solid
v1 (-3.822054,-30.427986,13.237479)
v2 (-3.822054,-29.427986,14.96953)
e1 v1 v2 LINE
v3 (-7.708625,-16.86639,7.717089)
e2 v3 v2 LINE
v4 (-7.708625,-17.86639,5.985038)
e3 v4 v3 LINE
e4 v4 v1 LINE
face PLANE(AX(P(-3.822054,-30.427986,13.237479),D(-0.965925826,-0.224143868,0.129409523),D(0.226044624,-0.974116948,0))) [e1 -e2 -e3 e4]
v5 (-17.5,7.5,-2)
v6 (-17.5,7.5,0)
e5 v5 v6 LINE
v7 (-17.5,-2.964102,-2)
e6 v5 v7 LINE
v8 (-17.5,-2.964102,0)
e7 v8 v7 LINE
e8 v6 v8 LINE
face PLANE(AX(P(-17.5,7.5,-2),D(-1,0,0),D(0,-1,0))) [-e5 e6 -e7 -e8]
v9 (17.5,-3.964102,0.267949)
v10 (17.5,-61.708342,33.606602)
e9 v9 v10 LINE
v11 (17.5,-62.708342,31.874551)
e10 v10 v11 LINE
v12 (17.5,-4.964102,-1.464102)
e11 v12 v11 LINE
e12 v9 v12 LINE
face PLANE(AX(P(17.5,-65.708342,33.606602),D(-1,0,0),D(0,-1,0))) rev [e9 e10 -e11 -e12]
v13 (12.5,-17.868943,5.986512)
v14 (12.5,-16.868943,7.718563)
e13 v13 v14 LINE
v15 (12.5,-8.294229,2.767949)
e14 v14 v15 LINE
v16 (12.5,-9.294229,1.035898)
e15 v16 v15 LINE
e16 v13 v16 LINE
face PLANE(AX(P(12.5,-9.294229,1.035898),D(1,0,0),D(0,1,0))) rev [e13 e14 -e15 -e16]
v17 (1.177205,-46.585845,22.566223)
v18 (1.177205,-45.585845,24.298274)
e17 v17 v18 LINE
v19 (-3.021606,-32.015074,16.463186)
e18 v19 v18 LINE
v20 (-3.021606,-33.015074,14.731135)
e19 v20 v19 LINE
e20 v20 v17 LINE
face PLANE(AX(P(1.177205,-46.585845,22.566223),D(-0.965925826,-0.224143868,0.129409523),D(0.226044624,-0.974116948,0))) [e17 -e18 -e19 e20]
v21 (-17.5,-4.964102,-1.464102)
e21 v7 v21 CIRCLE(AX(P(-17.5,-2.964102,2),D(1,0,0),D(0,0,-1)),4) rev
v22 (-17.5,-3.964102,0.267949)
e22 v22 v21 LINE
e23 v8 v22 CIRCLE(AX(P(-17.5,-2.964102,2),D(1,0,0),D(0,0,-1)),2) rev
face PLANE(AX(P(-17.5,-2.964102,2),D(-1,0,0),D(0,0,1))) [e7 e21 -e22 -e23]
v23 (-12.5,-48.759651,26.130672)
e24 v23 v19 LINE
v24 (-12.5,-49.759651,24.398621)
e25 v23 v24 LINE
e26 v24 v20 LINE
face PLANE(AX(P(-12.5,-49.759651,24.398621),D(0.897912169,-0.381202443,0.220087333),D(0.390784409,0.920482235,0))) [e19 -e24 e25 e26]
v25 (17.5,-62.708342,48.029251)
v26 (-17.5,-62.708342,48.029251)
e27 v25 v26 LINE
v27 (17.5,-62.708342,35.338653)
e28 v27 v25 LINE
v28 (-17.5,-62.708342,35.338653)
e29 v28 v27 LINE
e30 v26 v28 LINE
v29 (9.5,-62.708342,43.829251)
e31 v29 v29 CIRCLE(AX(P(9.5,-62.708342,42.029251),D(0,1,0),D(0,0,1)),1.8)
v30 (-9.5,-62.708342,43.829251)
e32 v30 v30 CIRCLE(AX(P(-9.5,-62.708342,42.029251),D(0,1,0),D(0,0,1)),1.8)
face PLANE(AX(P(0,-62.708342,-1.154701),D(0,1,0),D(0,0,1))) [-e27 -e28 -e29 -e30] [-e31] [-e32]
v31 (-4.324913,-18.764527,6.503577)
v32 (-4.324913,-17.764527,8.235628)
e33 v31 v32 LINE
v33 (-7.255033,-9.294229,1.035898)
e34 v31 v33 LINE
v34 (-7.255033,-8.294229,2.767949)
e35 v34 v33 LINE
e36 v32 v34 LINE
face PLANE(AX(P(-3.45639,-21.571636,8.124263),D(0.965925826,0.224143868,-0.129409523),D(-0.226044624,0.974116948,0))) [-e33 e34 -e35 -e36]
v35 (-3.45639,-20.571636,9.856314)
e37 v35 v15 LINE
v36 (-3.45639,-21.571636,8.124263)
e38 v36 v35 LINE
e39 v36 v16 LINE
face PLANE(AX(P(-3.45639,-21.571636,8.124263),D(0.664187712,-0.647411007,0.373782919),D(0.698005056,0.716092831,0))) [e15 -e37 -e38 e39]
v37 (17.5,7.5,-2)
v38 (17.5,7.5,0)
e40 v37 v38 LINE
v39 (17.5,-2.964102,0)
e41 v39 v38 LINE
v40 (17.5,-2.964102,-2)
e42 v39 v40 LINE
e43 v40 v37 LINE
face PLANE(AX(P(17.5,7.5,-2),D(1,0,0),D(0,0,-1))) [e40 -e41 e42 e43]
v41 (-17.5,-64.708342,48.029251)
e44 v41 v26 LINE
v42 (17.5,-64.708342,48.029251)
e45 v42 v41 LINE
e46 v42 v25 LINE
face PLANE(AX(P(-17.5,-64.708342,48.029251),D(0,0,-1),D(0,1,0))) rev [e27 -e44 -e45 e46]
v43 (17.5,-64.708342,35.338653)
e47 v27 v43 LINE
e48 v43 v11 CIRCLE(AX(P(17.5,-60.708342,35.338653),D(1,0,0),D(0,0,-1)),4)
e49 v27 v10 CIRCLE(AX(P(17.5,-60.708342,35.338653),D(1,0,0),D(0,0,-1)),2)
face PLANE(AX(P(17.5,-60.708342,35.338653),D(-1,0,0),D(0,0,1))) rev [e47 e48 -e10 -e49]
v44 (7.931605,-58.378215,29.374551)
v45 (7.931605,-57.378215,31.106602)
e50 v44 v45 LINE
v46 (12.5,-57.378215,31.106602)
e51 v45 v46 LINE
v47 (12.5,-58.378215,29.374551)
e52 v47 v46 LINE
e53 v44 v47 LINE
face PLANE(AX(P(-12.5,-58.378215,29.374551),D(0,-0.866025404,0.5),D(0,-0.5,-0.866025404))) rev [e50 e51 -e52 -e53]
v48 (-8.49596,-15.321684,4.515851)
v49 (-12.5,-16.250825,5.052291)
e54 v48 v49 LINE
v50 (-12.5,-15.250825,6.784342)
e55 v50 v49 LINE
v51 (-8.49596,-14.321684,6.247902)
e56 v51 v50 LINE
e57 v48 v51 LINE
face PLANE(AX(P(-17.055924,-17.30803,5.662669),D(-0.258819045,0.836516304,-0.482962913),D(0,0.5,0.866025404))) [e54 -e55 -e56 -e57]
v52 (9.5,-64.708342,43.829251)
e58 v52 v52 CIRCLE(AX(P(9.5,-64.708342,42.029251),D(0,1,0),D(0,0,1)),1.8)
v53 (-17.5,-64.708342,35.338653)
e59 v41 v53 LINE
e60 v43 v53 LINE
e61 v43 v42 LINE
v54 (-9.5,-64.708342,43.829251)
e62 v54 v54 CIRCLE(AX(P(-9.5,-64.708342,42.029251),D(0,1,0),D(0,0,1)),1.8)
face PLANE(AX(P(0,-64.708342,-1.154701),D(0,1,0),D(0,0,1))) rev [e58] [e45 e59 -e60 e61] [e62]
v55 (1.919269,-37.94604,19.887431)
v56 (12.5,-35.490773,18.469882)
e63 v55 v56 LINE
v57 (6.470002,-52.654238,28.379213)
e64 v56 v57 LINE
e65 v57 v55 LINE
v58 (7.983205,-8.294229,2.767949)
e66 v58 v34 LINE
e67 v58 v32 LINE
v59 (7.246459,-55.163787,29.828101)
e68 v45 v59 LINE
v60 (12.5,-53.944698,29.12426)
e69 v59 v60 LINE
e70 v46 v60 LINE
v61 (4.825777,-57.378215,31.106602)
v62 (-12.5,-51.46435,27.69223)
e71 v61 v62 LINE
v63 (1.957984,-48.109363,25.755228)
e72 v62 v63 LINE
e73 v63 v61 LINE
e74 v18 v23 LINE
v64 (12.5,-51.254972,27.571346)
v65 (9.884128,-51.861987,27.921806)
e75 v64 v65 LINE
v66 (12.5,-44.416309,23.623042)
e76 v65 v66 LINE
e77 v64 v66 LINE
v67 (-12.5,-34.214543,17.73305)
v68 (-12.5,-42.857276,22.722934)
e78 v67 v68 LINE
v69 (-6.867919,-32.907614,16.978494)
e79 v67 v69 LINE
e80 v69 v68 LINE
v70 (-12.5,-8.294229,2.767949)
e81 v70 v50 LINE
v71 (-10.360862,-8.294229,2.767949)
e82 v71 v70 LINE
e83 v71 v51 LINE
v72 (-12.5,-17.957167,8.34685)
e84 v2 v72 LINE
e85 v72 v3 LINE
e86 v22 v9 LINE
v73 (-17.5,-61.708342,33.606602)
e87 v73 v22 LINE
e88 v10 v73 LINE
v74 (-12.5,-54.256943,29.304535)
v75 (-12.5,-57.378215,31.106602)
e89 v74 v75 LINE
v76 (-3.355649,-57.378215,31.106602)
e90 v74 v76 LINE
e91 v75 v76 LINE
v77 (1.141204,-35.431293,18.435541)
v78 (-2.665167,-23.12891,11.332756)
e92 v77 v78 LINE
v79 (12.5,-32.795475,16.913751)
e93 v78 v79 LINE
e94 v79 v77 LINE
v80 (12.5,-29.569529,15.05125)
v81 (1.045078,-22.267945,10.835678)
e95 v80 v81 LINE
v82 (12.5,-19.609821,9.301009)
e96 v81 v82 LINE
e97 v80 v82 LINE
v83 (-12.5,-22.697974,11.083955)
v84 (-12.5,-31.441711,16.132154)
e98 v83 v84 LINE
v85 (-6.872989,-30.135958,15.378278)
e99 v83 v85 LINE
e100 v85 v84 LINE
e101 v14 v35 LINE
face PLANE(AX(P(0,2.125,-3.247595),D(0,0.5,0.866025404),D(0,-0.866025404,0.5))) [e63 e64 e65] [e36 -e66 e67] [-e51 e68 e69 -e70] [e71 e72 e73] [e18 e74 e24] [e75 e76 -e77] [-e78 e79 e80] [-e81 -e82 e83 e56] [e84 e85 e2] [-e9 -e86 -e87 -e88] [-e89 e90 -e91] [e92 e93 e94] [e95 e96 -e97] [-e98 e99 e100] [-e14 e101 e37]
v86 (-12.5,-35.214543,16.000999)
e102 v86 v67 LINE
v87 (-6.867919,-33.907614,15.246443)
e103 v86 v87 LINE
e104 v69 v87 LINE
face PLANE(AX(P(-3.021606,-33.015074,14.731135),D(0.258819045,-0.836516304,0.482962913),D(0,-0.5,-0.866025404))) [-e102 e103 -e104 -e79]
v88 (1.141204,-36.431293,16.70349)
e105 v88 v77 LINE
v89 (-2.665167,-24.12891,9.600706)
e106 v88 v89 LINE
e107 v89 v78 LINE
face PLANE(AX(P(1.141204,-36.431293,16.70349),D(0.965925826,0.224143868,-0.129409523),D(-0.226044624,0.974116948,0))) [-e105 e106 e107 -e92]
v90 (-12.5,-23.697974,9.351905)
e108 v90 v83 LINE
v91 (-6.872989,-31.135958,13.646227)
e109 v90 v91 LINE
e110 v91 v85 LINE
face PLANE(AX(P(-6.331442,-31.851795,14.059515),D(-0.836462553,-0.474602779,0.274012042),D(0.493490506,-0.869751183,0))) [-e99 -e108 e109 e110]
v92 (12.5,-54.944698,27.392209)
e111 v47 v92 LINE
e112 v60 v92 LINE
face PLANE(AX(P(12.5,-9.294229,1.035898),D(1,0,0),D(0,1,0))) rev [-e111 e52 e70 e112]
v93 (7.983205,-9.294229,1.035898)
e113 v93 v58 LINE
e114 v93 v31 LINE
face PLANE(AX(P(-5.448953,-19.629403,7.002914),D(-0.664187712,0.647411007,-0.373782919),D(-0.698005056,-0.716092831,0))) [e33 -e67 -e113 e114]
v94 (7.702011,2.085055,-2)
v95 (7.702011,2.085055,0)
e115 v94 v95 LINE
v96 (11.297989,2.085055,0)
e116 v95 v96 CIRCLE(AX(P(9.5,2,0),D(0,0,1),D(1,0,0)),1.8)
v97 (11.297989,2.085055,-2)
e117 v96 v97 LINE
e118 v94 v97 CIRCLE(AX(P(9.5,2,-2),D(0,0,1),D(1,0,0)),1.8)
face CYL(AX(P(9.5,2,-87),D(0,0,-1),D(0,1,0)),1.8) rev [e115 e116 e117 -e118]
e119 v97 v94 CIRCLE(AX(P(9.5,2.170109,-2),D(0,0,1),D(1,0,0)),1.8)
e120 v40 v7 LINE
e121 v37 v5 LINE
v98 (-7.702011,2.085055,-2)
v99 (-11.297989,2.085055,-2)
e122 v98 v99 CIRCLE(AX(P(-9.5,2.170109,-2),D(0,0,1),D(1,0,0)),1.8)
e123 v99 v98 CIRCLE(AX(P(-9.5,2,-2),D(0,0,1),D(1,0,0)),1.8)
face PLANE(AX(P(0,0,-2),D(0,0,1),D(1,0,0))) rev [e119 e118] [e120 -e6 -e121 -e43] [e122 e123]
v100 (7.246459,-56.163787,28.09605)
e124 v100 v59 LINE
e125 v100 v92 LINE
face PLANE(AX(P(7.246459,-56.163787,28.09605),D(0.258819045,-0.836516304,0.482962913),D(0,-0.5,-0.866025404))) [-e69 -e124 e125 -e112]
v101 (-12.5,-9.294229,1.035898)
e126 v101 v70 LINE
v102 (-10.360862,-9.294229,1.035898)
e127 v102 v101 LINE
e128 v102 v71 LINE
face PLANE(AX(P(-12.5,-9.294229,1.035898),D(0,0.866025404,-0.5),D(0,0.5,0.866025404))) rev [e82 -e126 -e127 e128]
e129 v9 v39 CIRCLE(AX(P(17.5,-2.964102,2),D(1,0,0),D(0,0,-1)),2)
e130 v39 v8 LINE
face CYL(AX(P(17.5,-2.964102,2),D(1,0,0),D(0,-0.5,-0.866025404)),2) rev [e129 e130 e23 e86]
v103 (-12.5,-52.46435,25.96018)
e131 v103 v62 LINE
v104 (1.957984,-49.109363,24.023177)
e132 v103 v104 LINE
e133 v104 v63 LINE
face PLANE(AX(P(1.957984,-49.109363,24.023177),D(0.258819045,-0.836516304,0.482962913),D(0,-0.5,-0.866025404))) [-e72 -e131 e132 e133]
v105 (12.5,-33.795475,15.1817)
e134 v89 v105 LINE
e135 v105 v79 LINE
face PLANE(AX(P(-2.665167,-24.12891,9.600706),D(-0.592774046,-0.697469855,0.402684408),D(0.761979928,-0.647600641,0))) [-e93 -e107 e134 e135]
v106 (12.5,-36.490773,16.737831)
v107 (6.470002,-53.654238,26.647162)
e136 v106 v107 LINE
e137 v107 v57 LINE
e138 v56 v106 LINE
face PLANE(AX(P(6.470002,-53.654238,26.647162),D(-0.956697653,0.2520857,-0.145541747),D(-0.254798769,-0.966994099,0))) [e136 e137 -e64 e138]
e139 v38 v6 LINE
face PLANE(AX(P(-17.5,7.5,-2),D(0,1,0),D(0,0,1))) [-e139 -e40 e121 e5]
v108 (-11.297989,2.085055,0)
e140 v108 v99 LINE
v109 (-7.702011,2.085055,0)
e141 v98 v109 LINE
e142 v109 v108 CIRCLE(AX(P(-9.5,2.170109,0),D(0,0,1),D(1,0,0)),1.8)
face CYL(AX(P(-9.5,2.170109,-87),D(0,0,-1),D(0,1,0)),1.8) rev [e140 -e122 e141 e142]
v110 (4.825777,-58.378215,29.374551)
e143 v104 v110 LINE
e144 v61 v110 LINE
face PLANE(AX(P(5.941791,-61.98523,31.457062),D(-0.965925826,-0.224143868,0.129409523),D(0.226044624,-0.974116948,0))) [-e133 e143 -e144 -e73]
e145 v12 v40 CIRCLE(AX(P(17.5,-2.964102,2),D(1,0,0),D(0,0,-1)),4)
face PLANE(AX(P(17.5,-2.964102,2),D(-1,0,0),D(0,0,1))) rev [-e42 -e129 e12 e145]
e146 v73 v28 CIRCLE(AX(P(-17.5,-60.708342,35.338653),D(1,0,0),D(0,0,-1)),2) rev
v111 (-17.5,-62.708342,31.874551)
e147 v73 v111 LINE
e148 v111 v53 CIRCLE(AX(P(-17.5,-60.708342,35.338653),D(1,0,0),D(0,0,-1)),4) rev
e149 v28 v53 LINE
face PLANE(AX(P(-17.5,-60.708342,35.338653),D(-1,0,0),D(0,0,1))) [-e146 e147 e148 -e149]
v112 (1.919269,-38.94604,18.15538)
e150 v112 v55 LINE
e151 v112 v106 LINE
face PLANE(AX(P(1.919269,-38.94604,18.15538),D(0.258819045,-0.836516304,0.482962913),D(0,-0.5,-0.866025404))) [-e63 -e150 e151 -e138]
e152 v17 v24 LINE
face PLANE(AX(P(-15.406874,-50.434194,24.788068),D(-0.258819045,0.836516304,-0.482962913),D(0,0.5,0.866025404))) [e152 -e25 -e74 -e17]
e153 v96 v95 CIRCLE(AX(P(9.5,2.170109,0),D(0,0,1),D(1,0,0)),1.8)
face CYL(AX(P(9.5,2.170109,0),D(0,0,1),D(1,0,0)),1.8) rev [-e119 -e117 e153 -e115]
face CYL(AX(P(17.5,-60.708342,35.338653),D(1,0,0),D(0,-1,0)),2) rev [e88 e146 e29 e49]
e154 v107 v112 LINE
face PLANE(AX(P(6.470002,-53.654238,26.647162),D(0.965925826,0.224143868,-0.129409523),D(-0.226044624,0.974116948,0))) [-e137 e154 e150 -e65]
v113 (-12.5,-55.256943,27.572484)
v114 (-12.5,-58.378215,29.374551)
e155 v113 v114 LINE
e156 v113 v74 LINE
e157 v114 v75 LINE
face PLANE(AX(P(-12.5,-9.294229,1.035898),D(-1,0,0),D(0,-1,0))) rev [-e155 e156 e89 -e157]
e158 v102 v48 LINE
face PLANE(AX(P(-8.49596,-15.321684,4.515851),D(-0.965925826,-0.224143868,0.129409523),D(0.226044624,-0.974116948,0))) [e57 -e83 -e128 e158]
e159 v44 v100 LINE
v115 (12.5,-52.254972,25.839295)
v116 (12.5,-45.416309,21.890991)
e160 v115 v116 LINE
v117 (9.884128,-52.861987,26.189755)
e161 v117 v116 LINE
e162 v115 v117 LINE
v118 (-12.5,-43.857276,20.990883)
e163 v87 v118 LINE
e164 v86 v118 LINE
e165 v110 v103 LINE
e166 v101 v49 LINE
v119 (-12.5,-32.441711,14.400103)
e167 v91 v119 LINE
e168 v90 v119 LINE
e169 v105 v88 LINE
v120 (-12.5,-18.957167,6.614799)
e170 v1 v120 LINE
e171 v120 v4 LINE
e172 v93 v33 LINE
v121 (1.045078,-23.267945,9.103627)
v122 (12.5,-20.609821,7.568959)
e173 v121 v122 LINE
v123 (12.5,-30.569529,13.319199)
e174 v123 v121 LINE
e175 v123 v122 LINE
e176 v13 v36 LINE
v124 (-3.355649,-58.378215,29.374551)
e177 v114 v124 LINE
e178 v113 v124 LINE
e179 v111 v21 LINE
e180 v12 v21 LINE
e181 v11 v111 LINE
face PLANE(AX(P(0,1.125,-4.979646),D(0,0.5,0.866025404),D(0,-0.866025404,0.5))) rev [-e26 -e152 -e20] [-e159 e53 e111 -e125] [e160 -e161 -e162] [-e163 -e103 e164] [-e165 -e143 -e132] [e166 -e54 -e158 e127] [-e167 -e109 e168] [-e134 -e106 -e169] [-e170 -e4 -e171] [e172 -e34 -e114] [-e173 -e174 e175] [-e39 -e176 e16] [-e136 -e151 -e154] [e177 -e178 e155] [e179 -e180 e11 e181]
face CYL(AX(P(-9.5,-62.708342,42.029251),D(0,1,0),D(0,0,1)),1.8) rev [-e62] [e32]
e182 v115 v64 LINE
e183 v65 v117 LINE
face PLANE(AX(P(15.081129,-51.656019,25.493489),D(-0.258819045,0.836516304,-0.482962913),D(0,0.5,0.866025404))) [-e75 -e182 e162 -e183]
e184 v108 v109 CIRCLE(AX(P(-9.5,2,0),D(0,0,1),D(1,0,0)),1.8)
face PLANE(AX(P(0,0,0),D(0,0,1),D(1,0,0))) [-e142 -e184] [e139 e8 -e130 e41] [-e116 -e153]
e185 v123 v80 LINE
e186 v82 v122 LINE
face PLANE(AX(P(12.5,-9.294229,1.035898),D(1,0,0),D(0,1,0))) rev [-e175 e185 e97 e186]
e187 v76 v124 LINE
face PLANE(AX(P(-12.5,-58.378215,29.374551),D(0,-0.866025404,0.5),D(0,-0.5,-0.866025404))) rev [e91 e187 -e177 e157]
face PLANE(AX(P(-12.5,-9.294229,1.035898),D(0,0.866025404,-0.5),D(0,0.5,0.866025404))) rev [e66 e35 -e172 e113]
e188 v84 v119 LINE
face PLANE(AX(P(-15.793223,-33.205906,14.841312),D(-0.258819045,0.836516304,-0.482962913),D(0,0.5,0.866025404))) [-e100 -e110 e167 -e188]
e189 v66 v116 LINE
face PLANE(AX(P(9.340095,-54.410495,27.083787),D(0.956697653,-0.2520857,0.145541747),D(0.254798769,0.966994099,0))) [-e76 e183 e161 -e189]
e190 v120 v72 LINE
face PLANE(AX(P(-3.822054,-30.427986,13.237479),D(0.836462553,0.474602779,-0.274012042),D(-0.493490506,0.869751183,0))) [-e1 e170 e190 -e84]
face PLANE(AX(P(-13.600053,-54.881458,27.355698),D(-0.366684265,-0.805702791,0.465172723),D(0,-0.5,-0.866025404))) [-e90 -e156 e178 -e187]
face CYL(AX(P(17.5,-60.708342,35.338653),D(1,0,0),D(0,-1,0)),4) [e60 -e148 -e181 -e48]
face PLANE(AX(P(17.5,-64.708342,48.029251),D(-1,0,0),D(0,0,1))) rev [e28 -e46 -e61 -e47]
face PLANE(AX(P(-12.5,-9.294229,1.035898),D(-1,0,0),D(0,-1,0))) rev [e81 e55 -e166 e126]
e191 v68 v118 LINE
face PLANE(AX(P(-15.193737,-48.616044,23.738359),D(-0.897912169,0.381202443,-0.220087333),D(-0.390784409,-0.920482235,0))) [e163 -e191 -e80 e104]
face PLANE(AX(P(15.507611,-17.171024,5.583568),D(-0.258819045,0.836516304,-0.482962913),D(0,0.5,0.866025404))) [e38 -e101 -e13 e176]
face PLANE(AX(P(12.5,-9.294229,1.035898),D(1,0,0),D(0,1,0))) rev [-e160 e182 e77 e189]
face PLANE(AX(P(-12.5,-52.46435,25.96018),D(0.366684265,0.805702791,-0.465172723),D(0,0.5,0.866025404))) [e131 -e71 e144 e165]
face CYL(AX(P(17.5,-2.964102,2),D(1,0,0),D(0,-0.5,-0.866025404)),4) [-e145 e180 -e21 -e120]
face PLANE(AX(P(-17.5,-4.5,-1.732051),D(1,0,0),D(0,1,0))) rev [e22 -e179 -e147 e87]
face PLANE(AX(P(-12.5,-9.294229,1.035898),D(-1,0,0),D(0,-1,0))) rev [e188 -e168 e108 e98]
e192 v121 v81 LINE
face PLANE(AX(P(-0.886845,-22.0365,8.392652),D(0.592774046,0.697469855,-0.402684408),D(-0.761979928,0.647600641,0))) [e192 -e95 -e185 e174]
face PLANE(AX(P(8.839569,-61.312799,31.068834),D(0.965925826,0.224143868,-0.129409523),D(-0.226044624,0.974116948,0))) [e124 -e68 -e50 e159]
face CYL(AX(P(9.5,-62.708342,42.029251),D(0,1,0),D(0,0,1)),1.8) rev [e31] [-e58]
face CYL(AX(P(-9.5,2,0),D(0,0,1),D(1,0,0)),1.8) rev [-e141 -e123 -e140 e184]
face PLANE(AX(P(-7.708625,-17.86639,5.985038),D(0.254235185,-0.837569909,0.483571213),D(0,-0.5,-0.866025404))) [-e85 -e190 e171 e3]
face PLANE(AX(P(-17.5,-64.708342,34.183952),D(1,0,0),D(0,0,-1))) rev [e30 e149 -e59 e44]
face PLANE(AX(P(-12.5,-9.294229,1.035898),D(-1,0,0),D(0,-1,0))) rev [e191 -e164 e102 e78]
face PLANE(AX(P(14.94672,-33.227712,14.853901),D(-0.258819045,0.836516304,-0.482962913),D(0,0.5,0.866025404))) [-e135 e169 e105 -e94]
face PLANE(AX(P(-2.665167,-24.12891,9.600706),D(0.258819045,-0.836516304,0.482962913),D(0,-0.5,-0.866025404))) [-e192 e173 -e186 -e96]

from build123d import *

# Parameters (mm, degrees)
SKETCH1_W            = 35
SKETCH1_H            = 15
BASE_FLANGE1_DEPTH   = 2
EDGE_FLANGE1_START   = -17.5
EDGE_FLANGE1_DEPTH   = 35
EDGE_FLANGE1_2_DEPTH = 35
EDGE_FLANGE2_START   = -17.5
EDGE_FLANGE2_DEPTH   = 35
EDGE_FLANGE2_2_DEPTH = 35
SKETCH8_W            = 25
SKETCH8_H            = 56.677305051
CUT_EXTRUDE1_DEPTH   = 10
BOSS_EXTRUDE1_DEPTH  = 2
BOSS_EXTRUDE2_DEPTH  = 2
M3_CLEARANCE_HOLE1_D = 3.6
M3_CLEARANCE_HOLE2_D = 3.6
M3_CLEARANCE_HOLE3_D = 3.6
M3_CLEARANCE_HOLE4_D = 3.6


# Read off the part's stored shape, not the designer's step: Edge-Flange1, Edge-Flange2
# Sheet-metal steps are written as plain solids
with BuildPart() as part:
    # Sketch1 → Base-Flange1 (new body)
    with BuildSketch(Plane.XY):
        Rectangle(SKETCH1_W, SKETCH1_H)
    extrude(amount=-BASE_FLANGE1_DEPTH)

    # Edge-Flange1 outline → Edge-Flange1 (cut)
    with BuildSketch(Plane.YZ.offset(EDGE_FLANGE1_START)):
        with BuildLine():
            ThreePointArc((-2.964101615, -2), (-3.999377795, -1.863703305), (-4.964101615, -1.464101615))
            Line((-4.964101615, -1.464101615), (-7.5, 0))
            Line((-7.5, 0), (-7.5, -2))
            Line((-7.5, -2), (-2.964101615, -2))
        make_face()
    extrude(amount=EDGE_FLANGE1_DEPTH, mode=Mode.SUBTRACT)

    # Edge-Flange1 2 outline → Edge-Flange1 2 (add)
    with BuildSketch(Plane.YZ.offset(EDGE_FLANGE1_START)):
        with BuildLine():
            Line((-65.708341645, 33.606601718), (-7.5, 0))
            Line((-7.5, 0), (-2.964101615, 0))
            ThreePointArc((-2.964101615, 0), (-3.481739705, 0.068148347), (-3.964101615, 0.267949192))
            Line((-3.964101615, 0.267949192), (-64.708341645, 35.338652525))
            Line((-64.708341645, 35.338652525), (-65.708341645, 33.606601718))
        make_face()
    extrude(amount=EDGE_FLANGE1_2_DEPTH)

    # Edge-Flange2 outline → Edge-Flange2 (cut)
    with BuildSketch(Plane.YZ.offset(EDGE_FLANGE2_START)):
        with BuildLine():
            ThreePointArc((-62.708341645, 31.87455091), (-64.17244326, 33.338652525), (-64.708341645, 35.338652525))
            Line((-64.708341645, 35.338652525), (-65.708341645, 33.606601718))
            Line((-65.708341645, 33.606601718), (-62.708341645, 31.87455091))
        make_face()
    extrude(amount=EDGE_FLANGE2_DEPTH, mode=Mode.SUBTRACT)

    # Edge-Flange2 2 outline → Edge-Flange2 2 (add)
    with BuildSketch(Plane.YZ.offset(EDGE_FLANGE2_START)):
        with BuildLine():
            Line((-64.708341645, 48.029251449), (-64.708341645, 35.338652525))
            Line((-64.708341645, 35.338652525), (-61.708341645, 33.606601718))
            ThreePointArc((-61.708341645, 33.606601718), (-62.440392453, 34.338652525), (-62.708341645, 35.338652525))
            Line((-62.708341645, 35.338652525), (-62.708341645, 48.029251449))
            Line((-62.708341645, 48.029251449), (-64.708341645, 48.029251449))
        make_face()
    extrude(amount=EDGE_FLANGE2_2_DEPTH)

    # Sketch8 → Cut-Extrude1 (cut)
    with BuildSketch(Plane(origin=(0, -0.875, -1.515544457), x_dir=(1, 0, 0), z_dir=(0, 0.499999999999995, 0.8660254037844416))):
        with Locations((0, -36.905639824)):
            Rectangle(SKETCH8_W, SKETCH8_H)
    extrude(amount=-CUT_EXTRUDE1_DEPTH, mode=Mode.SUBTRACT)

    # Sketch9 → Boss-Extrude1 (add)
    with BuildSketch(Plane(origin=(0, -0.875, -1.515544457), x_dir=(1, 0, 0), z_dir=(0, 0.499999999999995, 0.8660254037844416))):
        Polygon((8.83956854, -68.632858088), (7.246458748, -62.687291403), (15.857586038, -60.3799468), (15.081128903, -57.482169321), (6.470001613, -59.789513924), (1.919269462, -42.805950327), (15.365688048, -39.202993325), (14.946719777, -36.202993325), (1.14120391, -39.902170153), (-2.665166674, -25.696601742), (16.123001013, -20.662327383), (15.50761088, -17.662327383), (-3.456389996, -22.743716103), (-8.33426209, -4.539249615), (-11.232039569, -5.31570675), (-8.495960417, -15.52689316), (-17.05592393, -17.82052847), (-16.279466794, -20.718305949), (-7.708625485, -18.465267128), (-3.822054178, -32.970148713), (-15.793222539, -36.177813607), (-15.040127716, -39.177813607), (-3.021606391, -35.957460524), (1.177204702, -51.627636855), (-15.406874361, -56.071327447), (-14.947395895, -59.071327447), (1.957983923, -54.541544577), (5.941791061, -69.409315224), align=None)
    extrude(amount=-BOSS_EXTRUDE1_DEPTH)

    # Sketch10 → Boss-Extrude2 (add)
    with BuildSketch(Plane(origin=(0, -0.875, -1.515544457), x_dir=(1, 0, 0), z_dir=(0, 0.499999999999995, 0.8660254037844416))):
        Polygon((-3.456389996, -22.743716103), (12.5, -8.566987298), (10.507436864, -6.324289782), (-5.448953132, -20.501018587), align=None)
        Polygon((-2.665166674, -25.696601742), (12.5, -36.858589914), (14.278322137, -34.442483464), (-0.886844536, -23.280495293), align=None)
        Polygon((-3.822054178, -32.970148713), (-12.5, -19.724787915), (-15.00938766, -21.368860167), (-6.331441838, -34.614220965), align=None)
        Polygon((-12.5, -55.29243281), (-3.021606391, -35.957460524), (-5.715342898, -34.636936526), (-15.193736507, -53.971908812), align=None)
        Polygon((6.470001613, -59.789513924), (12.5, -39.970852124), (15.37009296, -40.844102603), (9.340094573, -60.662764404), align=None)
        Polygon((-12.5, -58.415549694), (4.825776546, -65.244292349), (3.725723751, -68.035328689), (-13.600052794, -61.206586033), align=None)
    extrude(amount=-BOSS_EXTRUDE2_DEPTH)

    # M3 Clearance Hole1 (through all)
    with Locations(Plane(origin=(-15.830402425, -63.569767603, -87), x_dir=(-1, 0, 0), z_dir=(0, 0, -1))):
        with Locations((-25.330402425, 65.569767603), (-6.330402425, 65.739876607)):
            Hole(M3_CLEARANCE_HOLE1_D / 2)

    # M3 Clearance Hole2 (through all)
    with Locations(Plane(origin=(15.830402425, -63.569767603, 0), x_dir=(1, 0, 0), z_dir=(0, 0, 1))):
        with Locations((-25.330402425, 65.569767603), (-6.330402425, 65.739876607)):
            Hole(M3_CLEARANCE_HOLE2_D / 2)

    # M3 Clearance Hole3 (through all)
    with Locations(Plane(origin=(15.830402425, -62.708341645, 22.375161803), x_dir=(-1, 0, 0), z_dir=(0, 1, 0))):
        with Locations((25.330402425, 19.654089646), (6.330402425, 19.654089646)):
            Hole(M3_CLEARANCE_HOLE3_D / 2)

    # M3 Clearance Hole4 (through all)
    with Locations(Plane(origin=(-15.830402425, -62.708341645, -109.375161803), x_dir=(1, 0, 0), z_dir=(0, 1, 0))):
        with Locations((25.330402425, -151.404413252), (6.330402425, -151.404413252)):
            Hole(M3_CLEARANCE_HOLE4_D / 2)


solid = part.part
